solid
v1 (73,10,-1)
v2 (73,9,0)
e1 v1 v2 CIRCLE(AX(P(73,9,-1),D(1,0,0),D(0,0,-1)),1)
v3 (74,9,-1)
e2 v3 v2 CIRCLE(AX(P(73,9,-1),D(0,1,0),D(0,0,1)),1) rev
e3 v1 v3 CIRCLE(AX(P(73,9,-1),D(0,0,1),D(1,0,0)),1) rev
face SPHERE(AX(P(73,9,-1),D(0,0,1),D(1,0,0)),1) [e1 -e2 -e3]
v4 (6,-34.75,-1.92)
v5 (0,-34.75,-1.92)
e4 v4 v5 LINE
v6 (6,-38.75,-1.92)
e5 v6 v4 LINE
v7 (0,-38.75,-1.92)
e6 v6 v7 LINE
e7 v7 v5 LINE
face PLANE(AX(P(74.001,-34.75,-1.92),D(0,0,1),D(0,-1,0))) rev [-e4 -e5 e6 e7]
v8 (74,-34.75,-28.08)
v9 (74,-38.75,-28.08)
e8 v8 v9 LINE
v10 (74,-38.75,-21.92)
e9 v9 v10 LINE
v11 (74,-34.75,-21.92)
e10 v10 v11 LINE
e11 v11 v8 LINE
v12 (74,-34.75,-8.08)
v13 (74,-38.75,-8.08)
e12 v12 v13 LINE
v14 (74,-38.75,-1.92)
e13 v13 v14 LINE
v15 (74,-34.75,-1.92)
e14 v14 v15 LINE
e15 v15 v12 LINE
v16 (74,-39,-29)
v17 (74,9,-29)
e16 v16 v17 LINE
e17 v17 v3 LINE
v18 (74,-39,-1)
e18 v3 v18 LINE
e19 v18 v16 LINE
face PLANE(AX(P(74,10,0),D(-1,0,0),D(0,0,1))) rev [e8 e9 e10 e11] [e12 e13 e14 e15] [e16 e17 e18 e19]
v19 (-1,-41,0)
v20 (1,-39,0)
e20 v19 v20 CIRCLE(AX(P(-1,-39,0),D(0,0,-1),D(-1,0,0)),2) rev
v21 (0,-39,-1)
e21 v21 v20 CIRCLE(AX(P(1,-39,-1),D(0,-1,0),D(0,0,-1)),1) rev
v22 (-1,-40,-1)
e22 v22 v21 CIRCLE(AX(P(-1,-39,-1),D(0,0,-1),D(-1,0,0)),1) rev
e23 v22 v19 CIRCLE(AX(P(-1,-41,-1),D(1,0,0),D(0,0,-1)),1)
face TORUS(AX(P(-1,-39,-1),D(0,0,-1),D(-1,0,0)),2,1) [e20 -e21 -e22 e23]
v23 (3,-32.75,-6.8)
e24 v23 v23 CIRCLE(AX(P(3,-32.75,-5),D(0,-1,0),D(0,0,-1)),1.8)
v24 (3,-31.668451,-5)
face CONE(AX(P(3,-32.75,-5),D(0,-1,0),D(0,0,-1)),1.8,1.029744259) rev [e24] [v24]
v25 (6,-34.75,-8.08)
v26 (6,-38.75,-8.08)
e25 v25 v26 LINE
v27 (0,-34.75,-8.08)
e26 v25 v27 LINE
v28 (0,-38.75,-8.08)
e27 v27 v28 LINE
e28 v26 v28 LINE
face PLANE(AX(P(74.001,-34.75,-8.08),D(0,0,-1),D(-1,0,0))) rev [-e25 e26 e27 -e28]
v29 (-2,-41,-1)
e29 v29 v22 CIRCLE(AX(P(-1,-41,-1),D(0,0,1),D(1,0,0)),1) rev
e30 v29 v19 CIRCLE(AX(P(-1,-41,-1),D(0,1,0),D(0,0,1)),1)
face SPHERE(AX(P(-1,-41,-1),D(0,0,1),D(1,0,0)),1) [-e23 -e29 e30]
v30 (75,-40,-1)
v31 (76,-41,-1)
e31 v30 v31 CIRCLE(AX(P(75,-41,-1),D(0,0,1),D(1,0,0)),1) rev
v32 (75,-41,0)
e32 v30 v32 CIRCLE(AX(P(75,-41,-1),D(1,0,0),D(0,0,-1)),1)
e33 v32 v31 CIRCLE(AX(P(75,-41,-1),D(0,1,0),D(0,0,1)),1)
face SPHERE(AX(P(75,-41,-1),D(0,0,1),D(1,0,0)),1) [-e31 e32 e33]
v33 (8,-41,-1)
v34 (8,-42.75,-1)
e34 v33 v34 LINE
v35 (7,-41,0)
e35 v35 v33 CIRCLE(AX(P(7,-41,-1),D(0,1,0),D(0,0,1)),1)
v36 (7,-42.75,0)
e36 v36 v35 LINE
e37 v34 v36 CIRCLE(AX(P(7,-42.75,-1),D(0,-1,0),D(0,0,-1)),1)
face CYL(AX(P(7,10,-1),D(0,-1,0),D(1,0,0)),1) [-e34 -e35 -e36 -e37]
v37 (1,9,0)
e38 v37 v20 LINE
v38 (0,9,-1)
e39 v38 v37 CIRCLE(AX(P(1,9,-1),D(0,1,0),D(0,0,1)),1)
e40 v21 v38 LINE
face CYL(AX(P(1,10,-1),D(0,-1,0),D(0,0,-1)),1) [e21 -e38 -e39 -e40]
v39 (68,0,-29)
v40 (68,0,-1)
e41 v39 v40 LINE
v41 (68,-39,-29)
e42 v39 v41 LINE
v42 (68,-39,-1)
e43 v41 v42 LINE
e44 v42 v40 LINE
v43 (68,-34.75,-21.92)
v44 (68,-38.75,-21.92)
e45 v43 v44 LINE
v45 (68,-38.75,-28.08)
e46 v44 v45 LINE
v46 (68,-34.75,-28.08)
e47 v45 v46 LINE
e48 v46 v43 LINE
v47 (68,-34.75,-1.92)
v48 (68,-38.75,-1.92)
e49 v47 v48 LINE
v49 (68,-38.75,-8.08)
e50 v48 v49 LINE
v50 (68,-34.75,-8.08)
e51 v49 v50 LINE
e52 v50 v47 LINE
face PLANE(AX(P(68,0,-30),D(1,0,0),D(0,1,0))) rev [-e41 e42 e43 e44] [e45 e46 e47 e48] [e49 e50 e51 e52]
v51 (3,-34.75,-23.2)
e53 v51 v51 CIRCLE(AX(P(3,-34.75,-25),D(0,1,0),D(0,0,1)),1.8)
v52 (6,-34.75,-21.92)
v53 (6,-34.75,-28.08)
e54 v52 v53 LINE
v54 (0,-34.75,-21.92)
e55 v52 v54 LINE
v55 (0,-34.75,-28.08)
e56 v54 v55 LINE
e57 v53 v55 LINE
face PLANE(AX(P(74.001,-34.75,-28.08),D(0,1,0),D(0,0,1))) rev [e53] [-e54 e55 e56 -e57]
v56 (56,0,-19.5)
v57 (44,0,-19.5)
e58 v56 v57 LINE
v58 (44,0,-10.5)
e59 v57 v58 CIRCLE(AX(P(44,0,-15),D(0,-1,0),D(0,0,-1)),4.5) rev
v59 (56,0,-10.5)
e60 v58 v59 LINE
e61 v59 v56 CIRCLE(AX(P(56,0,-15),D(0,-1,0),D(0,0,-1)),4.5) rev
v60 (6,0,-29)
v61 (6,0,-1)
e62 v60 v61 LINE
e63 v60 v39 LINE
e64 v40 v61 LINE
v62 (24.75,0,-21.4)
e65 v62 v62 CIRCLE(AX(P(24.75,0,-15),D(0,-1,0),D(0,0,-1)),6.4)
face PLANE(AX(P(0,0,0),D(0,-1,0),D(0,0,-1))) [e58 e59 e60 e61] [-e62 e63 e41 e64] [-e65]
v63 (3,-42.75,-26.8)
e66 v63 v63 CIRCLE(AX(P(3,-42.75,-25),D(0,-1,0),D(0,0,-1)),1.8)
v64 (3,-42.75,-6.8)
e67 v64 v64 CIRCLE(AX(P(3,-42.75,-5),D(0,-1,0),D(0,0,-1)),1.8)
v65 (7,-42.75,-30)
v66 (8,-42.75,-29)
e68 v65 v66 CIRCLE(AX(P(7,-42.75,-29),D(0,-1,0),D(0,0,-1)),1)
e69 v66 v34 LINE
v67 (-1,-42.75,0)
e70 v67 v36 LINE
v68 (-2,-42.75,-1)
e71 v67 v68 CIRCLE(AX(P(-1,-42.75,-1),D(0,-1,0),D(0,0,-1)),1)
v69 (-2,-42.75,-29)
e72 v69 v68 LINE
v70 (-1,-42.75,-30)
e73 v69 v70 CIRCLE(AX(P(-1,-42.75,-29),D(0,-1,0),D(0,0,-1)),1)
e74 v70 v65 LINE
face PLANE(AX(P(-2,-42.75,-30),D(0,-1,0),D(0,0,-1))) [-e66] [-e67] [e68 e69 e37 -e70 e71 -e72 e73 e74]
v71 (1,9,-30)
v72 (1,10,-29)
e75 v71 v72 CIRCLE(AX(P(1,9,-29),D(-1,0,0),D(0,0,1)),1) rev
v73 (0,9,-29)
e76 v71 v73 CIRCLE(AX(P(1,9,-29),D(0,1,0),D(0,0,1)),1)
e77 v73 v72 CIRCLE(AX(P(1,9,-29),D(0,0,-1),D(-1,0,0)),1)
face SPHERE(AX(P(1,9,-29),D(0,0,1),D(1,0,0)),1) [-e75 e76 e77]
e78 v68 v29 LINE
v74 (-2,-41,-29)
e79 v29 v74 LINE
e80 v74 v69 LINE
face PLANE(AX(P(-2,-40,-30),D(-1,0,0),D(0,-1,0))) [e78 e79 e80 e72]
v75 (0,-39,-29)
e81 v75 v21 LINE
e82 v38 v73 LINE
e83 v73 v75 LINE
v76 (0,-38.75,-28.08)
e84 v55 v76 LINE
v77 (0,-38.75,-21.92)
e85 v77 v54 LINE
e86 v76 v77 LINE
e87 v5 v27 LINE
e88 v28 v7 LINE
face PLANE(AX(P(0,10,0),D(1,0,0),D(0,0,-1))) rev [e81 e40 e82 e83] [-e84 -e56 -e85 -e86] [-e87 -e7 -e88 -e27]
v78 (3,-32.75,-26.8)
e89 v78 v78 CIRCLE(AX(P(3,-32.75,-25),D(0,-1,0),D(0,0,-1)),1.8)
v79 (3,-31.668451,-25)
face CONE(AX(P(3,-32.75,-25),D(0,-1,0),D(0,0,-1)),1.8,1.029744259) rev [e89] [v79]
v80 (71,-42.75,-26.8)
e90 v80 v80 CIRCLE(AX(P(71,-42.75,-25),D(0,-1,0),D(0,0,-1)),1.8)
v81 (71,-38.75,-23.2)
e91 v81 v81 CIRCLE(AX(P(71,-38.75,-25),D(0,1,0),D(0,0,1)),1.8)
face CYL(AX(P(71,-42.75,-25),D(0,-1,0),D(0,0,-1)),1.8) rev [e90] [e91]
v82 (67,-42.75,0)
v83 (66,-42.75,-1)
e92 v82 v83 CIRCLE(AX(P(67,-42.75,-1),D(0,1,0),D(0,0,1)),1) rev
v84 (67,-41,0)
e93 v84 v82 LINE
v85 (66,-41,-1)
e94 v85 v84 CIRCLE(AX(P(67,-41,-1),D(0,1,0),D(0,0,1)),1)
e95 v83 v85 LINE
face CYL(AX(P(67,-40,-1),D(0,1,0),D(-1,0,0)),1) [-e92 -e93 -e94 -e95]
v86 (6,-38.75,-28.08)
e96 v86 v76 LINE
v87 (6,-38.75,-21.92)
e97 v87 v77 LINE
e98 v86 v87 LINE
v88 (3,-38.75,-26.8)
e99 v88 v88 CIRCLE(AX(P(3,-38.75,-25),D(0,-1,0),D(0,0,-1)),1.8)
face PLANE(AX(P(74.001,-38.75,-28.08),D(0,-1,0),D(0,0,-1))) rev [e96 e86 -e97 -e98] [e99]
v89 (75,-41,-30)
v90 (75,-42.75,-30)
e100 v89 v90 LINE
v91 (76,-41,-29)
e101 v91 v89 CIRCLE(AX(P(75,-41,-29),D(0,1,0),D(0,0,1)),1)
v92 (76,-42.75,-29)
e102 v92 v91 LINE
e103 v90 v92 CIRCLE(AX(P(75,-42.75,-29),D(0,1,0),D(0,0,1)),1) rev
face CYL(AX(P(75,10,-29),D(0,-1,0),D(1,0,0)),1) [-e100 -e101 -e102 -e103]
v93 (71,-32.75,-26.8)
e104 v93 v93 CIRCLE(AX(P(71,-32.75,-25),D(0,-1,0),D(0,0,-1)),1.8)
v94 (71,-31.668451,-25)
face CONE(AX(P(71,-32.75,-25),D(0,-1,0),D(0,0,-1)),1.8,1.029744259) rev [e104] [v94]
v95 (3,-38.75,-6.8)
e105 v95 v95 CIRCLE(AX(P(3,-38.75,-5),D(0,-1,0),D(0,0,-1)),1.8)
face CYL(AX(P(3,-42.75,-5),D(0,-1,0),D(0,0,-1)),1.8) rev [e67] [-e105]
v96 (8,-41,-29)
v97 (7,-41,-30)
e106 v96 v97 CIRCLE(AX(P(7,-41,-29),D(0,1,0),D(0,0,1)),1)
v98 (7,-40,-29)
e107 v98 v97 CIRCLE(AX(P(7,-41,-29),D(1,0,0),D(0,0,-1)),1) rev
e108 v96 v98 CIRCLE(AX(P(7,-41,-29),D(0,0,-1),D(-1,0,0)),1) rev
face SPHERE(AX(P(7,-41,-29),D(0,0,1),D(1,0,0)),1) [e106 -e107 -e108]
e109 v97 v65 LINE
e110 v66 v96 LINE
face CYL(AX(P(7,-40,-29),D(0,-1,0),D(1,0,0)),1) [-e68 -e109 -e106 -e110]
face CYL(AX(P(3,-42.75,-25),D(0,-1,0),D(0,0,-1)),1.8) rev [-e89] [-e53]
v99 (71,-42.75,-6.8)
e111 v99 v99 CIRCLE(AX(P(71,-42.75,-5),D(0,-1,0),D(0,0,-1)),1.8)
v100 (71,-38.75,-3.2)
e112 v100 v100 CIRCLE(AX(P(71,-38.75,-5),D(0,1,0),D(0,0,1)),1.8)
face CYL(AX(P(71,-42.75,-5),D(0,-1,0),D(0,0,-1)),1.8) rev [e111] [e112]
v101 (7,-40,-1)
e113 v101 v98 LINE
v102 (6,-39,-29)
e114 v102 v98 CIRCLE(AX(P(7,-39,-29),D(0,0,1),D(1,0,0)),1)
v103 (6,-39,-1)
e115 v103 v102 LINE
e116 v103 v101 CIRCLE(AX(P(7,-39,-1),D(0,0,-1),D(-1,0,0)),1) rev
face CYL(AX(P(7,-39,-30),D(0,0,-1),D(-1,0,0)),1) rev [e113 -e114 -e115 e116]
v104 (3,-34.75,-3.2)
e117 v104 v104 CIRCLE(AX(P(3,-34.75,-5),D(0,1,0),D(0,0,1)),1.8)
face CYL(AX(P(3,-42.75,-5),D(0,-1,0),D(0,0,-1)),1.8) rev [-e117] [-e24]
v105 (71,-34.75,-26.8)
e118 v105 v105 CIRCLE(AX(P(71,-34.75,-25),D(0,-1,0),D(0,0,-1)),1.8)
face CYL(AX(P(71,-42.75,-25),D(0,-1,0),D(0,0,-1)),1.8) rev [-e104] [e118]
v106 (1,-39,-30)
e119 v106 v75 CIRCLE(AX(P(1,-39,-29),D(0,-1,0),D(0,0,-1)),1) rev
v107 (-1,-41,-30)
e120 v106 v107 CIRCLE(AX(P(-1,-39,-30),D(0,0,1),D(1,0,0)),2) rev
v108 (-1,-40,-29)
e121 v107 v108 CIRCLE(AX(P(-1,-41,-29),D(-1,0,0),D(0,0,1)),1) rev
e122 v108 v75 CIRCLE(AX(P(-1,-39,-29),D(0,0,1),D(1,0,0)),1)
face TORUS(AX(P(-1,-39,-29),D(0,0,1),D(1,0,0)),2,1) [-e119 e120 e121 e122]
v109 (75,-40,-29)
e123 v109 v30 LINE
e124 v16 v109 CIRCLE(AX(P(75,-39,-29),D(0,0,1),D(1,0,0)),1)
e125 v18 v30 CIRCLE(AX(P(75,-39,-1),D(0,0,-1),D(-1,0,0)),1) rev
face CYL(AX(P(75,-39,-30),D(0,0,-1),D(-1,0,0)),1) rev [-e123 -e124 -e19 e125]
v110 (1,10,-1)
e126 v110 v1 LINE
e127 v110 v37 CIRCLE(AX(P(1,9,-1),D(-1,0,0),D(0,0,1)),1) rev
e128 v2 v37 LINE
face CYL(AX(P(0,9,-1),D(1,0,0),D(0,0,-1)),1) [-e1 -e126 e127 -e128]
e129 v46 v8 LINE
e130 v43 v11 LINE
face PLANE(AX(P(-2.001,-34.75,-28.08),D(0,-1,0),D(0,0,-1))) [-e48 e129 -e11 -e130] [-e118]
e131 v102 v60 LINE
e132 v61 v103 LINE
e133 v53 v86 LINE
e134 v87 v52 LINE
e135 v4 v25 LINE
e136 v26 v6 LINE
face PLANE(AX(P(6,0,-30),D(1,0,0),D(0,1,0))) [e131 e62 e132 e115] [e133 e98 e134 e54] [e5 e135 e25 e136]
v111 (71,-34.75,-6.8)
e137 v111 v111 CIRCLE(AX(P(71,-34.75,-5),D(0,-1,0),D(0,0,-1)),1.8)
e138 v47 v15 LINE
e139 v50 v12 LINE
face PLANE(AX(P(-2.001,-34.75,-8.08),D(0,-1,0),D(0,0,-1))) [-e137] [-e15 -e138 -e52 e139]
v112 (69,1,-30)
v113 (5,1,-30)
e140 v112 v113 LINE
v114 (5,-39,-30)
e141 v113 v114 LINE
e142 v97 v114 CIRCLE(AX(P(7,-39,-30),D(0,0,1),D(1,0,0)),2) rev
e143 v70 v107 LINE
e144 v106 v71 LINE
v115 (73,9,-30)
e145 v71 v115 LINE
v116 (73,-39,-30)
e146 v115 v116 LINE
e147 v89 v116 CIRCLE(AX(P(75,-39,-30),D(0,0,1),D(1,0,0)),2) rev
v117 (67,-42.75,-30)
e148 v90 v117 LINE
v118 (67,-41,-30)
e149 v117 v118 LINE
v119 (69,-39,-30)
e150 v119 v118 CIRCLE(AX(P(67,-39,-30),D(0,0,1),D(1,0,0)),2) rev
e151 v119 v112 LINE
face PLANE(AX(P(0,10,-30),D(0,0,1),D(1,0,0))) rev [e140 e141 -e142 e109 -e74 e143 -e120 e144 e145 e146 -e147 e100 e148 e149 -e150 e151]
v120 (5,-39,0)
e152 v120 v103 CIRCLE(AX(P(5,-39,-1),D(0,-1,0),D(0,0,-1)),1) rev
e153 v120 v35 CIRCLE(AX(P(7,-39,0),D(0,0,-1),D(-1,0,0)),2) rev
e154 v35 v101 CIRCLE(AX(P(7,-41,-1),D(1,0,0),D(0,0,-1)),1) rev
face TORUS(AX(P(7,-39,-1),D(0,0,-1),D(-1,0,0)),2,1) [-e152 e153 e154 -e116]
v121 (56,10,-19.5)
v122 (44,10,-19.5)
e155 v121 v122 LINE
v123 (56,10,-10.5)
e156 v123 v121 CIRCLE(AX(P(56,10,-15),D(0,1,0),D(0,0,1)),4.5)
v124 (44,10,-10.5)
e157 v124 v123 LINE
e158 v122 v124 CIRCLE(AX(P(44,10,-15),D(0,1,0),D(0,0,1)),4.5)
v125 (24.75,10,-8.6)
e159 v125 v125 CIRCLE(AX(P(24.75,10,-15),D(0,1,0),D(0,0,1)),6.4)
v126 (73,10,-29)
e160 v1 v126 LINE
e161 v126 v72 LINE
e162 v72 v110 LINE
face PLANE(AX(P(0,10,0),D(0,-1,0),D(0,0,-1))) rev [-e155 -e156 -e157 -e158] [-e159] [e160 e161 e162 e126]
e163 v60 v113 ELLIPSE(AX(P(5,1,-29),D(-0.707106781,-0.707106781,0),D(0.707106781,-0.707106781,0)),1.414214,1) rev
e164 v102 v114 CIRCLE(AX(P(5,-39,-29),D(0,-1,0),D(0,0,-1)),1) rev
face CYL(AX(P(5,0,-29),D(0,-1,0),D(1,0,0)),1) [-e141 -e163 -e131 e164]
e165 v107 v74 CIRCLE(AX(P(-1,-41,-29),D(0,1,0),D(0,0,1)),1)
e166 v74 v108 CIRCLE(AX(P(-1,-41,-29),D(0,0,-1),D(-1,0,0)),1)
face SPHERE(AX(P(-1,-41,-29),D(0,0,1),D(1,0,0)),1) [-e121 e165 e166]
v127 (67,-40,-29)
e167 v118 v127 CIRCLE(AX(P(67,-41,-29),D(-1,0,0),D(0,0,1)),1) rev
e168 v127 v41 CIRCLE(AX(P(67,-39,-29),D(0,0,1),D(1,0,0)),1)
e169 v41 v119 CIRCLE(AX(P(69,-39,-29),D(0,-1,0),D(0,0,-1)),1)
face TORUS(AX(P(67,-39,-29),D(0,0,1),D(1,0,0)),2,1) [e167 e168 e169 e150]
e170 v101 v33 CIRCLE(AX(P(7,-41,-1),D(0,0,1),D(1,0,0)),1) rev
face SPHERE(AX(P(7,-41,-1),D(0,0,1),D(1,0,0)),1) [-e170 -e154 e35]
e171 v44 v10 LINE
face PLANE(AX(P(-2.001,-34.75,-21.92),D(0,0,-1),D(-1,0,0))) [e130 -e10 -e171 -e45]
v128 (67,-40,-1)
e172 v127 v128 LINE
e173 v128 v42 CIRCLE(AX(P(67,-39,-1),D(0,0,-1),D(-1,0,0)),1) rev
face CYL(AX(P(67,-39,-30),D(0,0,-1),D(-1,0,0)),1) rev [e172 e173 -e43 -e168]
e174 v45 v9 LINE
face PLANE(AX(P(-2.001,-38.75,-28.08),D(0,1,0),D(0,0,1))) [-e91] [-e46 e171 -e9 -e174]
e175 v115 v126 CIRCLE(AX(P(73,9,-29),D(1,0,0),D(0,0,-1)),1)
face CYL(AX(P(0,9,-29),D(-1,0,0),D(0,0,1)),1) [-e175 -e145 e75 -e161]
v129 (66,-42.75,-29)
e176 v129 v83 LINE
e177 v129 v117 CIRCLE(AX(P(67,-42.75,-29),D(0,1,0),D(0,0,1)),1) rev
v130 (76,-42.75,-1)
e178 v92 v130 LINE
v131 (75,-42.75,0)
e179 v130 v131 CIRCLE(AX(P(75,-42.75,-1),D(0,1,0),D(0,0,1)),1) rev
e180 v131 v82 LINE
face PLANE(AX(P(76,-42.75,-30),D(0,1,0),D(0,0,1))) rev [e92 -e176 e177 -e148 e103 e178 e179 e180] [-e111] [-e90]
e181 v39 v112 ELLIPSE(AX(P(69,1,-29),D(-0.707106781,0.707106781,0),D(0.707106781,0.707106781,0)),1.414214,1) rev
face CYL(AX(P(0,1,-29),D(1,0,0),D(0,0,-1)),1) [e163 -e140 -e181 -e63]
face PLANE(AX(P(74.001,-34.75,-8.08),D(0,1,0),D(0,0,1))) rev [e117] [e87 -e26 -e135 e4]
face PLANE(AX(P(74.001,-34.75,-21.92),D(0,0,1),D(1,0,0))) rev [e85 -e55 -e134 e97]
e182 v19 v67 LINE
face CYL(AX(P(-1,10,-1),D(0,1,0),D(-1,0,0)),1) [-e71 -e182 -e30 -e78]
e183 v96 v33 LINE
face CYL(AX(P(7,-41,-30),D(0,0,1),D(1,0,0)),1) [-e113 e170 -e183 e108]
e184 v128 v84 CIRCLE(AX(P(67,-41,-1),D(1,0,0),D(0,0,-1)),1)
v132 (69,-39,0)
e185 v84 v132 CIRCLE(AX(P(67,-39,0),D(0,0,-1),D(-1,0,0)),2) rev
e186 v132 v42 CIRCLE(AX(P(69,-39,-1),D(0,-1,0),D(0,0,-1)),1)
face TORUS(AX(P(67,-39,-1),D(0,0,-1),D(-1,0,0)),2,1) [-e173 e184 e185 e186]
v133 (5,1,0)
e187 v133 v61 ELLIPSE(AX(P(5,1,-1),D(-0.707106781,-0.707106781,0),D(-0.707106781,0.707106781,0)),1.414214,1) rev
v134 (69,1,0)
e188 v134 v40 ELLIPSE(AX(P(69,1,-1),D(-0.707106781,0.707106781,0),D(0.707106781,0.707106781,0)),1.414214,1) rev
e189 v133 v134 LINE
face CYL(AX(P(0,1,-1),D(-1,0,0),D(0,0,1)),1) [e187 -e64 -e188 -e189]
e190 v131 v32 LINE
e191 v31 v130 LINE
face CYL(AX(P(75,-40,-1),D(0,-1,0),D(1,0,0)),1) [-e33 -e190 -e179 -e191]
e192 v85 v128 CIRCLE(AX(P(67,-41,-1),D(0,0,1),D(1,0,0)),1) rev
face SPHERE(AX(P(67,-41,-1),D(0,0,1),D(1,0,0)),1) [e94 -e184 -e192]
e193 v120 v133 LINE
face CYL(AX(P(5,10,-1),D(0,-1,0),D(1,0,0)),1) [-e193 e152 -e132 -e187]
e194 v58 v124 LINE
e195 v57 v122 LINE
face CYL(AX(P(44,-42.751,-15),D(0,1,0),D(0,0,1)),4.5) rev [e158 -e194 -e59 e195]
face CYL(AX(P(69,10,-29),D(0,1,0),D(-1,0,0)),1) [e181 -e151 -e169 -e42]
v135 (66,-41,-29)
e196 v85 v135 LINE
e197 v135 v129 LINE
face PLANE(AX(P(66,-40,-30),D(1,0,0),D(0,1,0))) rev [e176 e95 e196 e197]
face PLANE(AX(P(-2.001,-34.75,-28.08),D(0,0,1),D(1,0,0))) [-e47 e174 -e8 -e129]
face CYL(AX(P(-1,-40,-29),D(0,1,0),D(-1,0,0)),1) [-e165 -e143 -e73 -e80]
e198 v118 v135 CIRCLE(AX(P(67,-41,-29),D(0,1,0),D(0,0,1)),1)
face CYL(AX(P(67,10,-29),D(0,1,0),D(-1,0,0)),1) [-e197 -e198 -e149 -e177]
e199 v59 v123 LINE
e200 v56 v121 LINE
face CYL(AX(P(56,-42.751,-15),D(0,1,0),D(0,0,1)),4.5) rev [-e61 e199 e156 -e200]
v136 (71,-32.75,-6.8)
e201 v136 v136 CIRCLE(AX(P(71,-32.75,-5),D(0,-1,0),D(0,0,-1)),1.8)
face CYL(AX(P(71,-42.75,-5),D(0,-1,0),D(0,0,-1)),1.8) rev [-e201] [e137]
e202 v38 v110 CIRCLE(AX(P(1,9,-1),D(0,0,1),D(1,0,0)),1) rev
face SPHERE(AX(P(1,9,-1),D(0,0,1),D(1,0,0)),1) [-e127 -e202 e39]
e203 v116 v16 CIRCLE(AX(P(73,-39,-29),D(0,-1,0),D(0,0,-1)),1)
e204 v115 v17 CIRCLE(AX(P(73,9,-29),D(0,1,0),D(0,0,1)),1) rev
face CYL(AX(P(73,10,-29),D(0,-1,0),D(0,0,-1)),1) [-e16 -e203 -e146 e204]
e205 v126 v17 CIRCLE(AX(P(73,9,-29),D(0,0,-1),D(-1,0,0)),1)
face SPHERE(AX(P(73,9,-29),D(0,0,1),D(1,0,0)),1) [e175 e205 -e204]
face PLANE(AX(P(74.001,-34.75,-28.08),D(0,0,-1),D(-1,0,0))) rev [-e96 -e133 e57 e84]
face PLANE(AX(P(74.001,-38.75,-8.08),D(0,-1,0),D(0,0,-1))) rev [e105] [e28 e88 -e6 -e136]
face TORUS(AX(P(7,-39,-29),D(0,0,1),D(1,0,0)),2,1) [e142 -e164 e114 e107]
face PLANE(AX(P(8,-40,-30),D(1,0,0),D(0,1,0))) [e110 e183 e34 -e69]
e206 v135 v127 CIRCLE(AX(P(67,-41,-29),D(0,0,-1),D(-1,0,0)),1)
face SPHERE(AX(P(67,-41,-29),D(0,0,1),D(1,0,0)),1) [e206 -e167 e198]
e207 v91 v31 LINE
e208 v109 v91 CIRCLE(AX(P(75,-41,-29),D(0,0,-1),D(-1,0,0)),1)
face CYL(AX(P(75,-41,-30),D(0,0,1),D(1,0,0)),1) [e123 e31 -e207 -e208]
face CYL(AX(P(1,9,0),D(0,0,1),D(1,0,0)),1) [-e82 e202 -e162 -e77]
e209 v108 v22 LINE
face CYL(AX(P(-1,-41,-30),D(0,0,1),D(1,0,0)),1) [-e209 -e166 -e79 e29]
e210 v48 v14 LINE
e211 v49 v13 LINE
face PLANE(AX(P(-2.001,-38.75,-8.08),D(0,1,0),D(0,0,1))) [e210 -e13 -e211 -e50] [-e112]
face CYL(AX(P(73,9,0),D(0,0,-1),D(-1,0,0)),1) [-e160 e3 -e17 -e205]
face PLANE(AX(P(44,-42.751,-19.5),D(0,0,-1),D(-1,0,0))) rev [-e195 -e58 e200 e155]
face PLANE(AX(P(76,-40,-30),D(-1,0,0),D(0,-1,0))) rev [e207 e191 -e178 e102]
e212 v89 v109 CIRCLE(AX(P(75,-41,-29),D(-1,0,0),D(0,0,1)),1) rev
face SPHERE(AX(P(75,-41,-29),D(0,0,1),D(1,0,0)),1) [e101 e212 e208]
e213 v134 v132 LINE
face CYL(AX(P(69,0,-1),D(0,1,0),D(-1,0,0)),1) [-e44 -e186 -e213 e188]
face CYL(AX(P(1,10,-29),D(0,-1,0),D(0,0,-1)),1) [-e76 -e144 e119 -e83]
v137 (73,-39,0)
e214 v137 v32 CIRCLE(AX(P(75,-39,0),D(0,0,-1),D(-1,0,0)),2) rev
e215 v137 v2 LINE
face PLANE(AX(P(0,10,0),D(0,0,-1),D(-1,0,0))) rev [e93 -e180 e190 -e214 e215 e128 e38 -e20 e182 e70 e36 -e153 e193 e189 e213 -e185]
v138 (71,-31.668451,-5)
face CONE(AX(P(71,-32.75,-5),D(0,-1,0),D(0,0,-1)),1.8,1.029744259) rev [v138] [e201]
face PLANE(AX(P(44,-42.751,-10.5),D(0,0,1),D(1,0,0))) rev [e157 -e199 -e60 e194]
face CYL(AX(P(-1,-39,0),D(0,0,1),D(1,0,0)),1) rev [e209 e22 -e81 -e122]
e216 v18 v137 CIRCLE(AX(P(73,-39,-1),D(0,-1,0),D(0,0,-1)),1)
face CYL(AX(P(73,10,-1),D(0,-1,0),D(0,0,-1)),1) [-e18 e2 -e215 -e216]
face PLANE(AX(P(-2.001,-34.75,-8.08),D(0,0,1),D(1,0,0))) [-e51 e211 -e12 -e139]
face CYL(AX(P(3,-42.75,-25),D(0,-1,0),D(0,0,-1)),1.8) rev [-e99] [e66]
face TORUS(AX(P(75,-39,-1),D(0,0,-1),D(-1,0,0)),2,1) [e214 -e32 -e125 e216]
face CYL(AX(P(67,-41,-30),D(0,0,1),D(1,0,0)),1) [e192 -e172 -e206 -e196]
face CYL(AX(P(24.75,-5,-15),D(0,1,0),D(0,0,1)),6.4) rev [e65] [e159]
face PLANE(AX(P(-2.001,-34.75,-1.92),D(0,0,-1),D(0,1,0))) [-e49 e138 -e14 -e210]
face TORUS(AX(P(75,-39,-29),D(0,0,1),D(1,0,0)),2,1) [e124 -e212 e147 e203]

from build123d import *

# Parameters (mm, degrees)
SKETCH1_W                     = 74
SKETCH1_H                     = 30
BOSS_EXTRUDE1_DEPTH           = 10
SKETCH2_R                     = 6.4
CUT_EXTRUDE1_DEPTH            = 15
BOSS_EXTRUDE2_DEPTH           = 30
M3_CLEARANCE_HOLE1_AT_2_COUNT = 2
M3_CLEARANCE_HOLE1_AT_2_PITCH = 20
CUT_EXTRUDE2_REACH            = 92.574
SKETCH10_W                    = 6.16
SKETCH10_H                    = 4
FILLET1_R                     = 1
CUT_EXTRUDE3_REACH            = 99.255


with BuildPart() as part:
    # Sketch1 → Boss-Extrude1 (new body)
    with BuildSketch(Plane(origin=(0, 0, 0), x_dir=(1, 0, 0), z_dir=(0, 1, 0))):
        with Locations((37, 15)):
            Rectangle(SKETCH1_W, SKETCH1_H)
    extrude(amount=BOSS_EXTRUDE1_DEPTH)

    # Sketch2 → Cut-Extrude1 (cut)
    with BuildSketch(Plane(origin=(0, 10, 0), x_dir=(1, 0, 0), z_dir=(0, 1, 0))):
        with Locations(Location((24.75, 15, 0), (0, 0, 270))):
            Circle(SKETCH2_R)
    extrude(amount=-CUT_EXTRUDE1_DEPTH, mode=Mode.SUBTRACT)

    # Sketch3 → Boss-Extrude2 (add)
    with BuildSketch(Plane.XY):
        Polygon((6, -40), (8, -40), (8, -42.75), (-2, -42.75), (-2, -40), (0, -40), (0, 0), (6, 0), align=None)
    boss_extrude2 = extrude(amount=-BOSS_EXTRUDE2_DEPTH)

    # Sketch9 → M3 Clearance Hole1 (revolve, cut)
    with BuildSketch(Plane(origin=(3, -42.75, -5), x_dir=(0, 0, -1), z_dir=(1, 0, 0))):
        Polygon((0, 0), (0, 11.081549114), (1.8, 10), (1.8, 0), align=None)
    m3_clearance_hole1 = revolve(axis=Axis((3, -49.1, -5), (0, 1, 0)), mode=Mode.SUBTRACT)

    # M3 Clearance Hole1 at 2: M3 Clearance Hole1 ×2
    with Locations(*[(0, 0, -i * M3_CLEARANCE_HOLE1_AT_2_PITCH) for i in range(1, M3_CLEARANCE_HOLE1_AT_2_COUNT)]):
        add(m3_clearance_hole1, mode=Mode.SUBTRACT)

    # Sketch10 → Cut-Extrude2 (cut, up to next)
    with BuildSketch(Plane.ZY, mode=Mode.PRIVATE) as cut_extrude2_sk1:
        with Locations((-25, -36.75)):
            Rectangle(SKETCH10_W, SKETCH10_H)
    cut_extrude2_tool1 = extrude(cut_extrude2_sk1.sketch, amount=-CUT_EXTRUDE2_REACH, mode=Mode.PRIVATE) & part.part
    # Sketch10 → Cut-Extrude2 (cut, up to next)
    with BuildSketch(Plane.ZY, mode=Mode.PRIVATE) as cut_extrude2_sk2:
        with Locations((-5, -36.75)):
            Rectangle(SKETCH10_W, SKETCH10_H)
    cut_extrude2_tool2 = extrude(cut_extrude2_sk2.sketch, amount=-CUT_EXTRUDE2_REACH, mode=Mode.PRIVATE) & part.part
    cut_extrude2_1 = cut_extrude2_tool1.solids().sort_by_distance((0, -36.75, -25))[0]
    add(cut_extrude2_1, mode=Mode.SUBTRACT)
    cut_extrude2_2 = cut_extrude2_tool2.solids().sort_by_distance((0, -36.75, -5))[0]
    add(cut_extrude2_2, mode=Mode.SUBTRACT)
    cut_extrude2 = cut_extrude2_1 + cut_extrude2_2  # Cut-Extrude2 as one shape, for the pattern or mirror that repeats it

    # Mirror1: Boss-Extrude2, M3 Clearance Hole1, Cut-Extrude2 across plane
    add(boss_extrude2.mirror(Plane.ZY.offset(-37)))
    add(m3_clearance_hole1.mirror(Plane.ZY.offset(-37)), mode=Mode.SUBTRACT)
    add(cut_extrude2.mirror(Plane.ZY.offset(-37)), mode=Mode.SUBTRACT)

    # Mirror1 copy 1 sketch → Mirror1 copy 1 (revolve, cut)
    with BuildSketch(Plane(origin=(71, -42.75, -25), x_dir=(0, 0, -1), z_dir=(-1, 0, 0))):
        Polygon((0, 0), (0, -11.081549114), (1.8, -10), (1.8, 0), align=None)
    revolve(axis=Axis((71, -49.1, -25), (0, -1, 0)), mode=Mode.SUBTRACT)

    # Fillet1
    fillet1_edges = [part.edges().sort_by_distance(p)[0] for p in [
        (74, -40, -15),
        (68, -40, -15),
        (6, -40, -15),
        (0, -40, -15),
    ]]
    fillet(fillet1_edges, radius=FILLET1_R)
    fillet1_2_edges = [part.edges().sort_by_distance(p)[0] for p in [
        (66, -41.375, 0),
        (66, -41.375, -30),
        (76, -41.375, 0),
        (76, -41.375, -30),
        (76, -40, -15),
        (66, -40, -15),
        (8, -41.375, 0),
        (8, -41.375, -30),
        (8, -40, -15),
        (-2, -41.375, -30),
        (-2, -41.375, 0),
        (-2, -40, -15),
        (74, -14.5, 0),
        (68, -19.5, 0),
        (68, -19.5, -30),
        (37, 0, 0),
        (6, -19.5, 0),
        (0, -14.5, 0),
        (74, 10, -15),
        (37, 10, 0),
        (0, 10, -15),
        (74, -14.5, -30),
        (0, -14.5, -30),
        (6, -19.5, -30),
        (37, 0, -30),
        (37, 10, -30),
        (6.292893219, -39.707106781, -30),
        (-0.292893219, -39.707106781, -30),
        (74.292893219, -39.707106781, -30),
        (-0.292893219, -39.707106781, 0),
        (6.292893219, -39.707106781, 0),
        (67.707106781, -39.707106781, -30),
        (67.707106781, -39.707106781, 0),
        (74.292893219, -39.707106781, 0),
    ]]
    fillet(fillet1_2_edges, radius=FILLET1_R - 0.0001)  # a hair under: the kernel refuses the full size

    # Sketch11 → Cut-Extrude3 (cut, up to next)
    with BuildSketch(Plane(origin=(0, 10, 0), x_dir=(1, 0, 0), z_dir=(0, 1, 0)), mode=Mode.PRIVATE) as cut_extrude3_sk1:
        with BuildLine():
            Line((44, 19.5), (56, 19.5))
            ThreePointArc((56, 19.5), (60.5, 15), (56, 10.5))
            Line((56, 10.5), (44, 10.5))
            ThreePointArc((44, 10.5), (39.5, 15), (44, 19.5))
        make_face()
    cut_extrude3_tool1 = extrude(cut_extrude3_sk1.sketch, amount=-CUT_EXTRUDE3_REACH, mode=Mode.PRIVATE) & part.part
    add(cut_extrude3_tool1.solids().sort_by_distance((50, 10, -15))[0], mode=Mode.SUBTRACT)


solid = part.part
